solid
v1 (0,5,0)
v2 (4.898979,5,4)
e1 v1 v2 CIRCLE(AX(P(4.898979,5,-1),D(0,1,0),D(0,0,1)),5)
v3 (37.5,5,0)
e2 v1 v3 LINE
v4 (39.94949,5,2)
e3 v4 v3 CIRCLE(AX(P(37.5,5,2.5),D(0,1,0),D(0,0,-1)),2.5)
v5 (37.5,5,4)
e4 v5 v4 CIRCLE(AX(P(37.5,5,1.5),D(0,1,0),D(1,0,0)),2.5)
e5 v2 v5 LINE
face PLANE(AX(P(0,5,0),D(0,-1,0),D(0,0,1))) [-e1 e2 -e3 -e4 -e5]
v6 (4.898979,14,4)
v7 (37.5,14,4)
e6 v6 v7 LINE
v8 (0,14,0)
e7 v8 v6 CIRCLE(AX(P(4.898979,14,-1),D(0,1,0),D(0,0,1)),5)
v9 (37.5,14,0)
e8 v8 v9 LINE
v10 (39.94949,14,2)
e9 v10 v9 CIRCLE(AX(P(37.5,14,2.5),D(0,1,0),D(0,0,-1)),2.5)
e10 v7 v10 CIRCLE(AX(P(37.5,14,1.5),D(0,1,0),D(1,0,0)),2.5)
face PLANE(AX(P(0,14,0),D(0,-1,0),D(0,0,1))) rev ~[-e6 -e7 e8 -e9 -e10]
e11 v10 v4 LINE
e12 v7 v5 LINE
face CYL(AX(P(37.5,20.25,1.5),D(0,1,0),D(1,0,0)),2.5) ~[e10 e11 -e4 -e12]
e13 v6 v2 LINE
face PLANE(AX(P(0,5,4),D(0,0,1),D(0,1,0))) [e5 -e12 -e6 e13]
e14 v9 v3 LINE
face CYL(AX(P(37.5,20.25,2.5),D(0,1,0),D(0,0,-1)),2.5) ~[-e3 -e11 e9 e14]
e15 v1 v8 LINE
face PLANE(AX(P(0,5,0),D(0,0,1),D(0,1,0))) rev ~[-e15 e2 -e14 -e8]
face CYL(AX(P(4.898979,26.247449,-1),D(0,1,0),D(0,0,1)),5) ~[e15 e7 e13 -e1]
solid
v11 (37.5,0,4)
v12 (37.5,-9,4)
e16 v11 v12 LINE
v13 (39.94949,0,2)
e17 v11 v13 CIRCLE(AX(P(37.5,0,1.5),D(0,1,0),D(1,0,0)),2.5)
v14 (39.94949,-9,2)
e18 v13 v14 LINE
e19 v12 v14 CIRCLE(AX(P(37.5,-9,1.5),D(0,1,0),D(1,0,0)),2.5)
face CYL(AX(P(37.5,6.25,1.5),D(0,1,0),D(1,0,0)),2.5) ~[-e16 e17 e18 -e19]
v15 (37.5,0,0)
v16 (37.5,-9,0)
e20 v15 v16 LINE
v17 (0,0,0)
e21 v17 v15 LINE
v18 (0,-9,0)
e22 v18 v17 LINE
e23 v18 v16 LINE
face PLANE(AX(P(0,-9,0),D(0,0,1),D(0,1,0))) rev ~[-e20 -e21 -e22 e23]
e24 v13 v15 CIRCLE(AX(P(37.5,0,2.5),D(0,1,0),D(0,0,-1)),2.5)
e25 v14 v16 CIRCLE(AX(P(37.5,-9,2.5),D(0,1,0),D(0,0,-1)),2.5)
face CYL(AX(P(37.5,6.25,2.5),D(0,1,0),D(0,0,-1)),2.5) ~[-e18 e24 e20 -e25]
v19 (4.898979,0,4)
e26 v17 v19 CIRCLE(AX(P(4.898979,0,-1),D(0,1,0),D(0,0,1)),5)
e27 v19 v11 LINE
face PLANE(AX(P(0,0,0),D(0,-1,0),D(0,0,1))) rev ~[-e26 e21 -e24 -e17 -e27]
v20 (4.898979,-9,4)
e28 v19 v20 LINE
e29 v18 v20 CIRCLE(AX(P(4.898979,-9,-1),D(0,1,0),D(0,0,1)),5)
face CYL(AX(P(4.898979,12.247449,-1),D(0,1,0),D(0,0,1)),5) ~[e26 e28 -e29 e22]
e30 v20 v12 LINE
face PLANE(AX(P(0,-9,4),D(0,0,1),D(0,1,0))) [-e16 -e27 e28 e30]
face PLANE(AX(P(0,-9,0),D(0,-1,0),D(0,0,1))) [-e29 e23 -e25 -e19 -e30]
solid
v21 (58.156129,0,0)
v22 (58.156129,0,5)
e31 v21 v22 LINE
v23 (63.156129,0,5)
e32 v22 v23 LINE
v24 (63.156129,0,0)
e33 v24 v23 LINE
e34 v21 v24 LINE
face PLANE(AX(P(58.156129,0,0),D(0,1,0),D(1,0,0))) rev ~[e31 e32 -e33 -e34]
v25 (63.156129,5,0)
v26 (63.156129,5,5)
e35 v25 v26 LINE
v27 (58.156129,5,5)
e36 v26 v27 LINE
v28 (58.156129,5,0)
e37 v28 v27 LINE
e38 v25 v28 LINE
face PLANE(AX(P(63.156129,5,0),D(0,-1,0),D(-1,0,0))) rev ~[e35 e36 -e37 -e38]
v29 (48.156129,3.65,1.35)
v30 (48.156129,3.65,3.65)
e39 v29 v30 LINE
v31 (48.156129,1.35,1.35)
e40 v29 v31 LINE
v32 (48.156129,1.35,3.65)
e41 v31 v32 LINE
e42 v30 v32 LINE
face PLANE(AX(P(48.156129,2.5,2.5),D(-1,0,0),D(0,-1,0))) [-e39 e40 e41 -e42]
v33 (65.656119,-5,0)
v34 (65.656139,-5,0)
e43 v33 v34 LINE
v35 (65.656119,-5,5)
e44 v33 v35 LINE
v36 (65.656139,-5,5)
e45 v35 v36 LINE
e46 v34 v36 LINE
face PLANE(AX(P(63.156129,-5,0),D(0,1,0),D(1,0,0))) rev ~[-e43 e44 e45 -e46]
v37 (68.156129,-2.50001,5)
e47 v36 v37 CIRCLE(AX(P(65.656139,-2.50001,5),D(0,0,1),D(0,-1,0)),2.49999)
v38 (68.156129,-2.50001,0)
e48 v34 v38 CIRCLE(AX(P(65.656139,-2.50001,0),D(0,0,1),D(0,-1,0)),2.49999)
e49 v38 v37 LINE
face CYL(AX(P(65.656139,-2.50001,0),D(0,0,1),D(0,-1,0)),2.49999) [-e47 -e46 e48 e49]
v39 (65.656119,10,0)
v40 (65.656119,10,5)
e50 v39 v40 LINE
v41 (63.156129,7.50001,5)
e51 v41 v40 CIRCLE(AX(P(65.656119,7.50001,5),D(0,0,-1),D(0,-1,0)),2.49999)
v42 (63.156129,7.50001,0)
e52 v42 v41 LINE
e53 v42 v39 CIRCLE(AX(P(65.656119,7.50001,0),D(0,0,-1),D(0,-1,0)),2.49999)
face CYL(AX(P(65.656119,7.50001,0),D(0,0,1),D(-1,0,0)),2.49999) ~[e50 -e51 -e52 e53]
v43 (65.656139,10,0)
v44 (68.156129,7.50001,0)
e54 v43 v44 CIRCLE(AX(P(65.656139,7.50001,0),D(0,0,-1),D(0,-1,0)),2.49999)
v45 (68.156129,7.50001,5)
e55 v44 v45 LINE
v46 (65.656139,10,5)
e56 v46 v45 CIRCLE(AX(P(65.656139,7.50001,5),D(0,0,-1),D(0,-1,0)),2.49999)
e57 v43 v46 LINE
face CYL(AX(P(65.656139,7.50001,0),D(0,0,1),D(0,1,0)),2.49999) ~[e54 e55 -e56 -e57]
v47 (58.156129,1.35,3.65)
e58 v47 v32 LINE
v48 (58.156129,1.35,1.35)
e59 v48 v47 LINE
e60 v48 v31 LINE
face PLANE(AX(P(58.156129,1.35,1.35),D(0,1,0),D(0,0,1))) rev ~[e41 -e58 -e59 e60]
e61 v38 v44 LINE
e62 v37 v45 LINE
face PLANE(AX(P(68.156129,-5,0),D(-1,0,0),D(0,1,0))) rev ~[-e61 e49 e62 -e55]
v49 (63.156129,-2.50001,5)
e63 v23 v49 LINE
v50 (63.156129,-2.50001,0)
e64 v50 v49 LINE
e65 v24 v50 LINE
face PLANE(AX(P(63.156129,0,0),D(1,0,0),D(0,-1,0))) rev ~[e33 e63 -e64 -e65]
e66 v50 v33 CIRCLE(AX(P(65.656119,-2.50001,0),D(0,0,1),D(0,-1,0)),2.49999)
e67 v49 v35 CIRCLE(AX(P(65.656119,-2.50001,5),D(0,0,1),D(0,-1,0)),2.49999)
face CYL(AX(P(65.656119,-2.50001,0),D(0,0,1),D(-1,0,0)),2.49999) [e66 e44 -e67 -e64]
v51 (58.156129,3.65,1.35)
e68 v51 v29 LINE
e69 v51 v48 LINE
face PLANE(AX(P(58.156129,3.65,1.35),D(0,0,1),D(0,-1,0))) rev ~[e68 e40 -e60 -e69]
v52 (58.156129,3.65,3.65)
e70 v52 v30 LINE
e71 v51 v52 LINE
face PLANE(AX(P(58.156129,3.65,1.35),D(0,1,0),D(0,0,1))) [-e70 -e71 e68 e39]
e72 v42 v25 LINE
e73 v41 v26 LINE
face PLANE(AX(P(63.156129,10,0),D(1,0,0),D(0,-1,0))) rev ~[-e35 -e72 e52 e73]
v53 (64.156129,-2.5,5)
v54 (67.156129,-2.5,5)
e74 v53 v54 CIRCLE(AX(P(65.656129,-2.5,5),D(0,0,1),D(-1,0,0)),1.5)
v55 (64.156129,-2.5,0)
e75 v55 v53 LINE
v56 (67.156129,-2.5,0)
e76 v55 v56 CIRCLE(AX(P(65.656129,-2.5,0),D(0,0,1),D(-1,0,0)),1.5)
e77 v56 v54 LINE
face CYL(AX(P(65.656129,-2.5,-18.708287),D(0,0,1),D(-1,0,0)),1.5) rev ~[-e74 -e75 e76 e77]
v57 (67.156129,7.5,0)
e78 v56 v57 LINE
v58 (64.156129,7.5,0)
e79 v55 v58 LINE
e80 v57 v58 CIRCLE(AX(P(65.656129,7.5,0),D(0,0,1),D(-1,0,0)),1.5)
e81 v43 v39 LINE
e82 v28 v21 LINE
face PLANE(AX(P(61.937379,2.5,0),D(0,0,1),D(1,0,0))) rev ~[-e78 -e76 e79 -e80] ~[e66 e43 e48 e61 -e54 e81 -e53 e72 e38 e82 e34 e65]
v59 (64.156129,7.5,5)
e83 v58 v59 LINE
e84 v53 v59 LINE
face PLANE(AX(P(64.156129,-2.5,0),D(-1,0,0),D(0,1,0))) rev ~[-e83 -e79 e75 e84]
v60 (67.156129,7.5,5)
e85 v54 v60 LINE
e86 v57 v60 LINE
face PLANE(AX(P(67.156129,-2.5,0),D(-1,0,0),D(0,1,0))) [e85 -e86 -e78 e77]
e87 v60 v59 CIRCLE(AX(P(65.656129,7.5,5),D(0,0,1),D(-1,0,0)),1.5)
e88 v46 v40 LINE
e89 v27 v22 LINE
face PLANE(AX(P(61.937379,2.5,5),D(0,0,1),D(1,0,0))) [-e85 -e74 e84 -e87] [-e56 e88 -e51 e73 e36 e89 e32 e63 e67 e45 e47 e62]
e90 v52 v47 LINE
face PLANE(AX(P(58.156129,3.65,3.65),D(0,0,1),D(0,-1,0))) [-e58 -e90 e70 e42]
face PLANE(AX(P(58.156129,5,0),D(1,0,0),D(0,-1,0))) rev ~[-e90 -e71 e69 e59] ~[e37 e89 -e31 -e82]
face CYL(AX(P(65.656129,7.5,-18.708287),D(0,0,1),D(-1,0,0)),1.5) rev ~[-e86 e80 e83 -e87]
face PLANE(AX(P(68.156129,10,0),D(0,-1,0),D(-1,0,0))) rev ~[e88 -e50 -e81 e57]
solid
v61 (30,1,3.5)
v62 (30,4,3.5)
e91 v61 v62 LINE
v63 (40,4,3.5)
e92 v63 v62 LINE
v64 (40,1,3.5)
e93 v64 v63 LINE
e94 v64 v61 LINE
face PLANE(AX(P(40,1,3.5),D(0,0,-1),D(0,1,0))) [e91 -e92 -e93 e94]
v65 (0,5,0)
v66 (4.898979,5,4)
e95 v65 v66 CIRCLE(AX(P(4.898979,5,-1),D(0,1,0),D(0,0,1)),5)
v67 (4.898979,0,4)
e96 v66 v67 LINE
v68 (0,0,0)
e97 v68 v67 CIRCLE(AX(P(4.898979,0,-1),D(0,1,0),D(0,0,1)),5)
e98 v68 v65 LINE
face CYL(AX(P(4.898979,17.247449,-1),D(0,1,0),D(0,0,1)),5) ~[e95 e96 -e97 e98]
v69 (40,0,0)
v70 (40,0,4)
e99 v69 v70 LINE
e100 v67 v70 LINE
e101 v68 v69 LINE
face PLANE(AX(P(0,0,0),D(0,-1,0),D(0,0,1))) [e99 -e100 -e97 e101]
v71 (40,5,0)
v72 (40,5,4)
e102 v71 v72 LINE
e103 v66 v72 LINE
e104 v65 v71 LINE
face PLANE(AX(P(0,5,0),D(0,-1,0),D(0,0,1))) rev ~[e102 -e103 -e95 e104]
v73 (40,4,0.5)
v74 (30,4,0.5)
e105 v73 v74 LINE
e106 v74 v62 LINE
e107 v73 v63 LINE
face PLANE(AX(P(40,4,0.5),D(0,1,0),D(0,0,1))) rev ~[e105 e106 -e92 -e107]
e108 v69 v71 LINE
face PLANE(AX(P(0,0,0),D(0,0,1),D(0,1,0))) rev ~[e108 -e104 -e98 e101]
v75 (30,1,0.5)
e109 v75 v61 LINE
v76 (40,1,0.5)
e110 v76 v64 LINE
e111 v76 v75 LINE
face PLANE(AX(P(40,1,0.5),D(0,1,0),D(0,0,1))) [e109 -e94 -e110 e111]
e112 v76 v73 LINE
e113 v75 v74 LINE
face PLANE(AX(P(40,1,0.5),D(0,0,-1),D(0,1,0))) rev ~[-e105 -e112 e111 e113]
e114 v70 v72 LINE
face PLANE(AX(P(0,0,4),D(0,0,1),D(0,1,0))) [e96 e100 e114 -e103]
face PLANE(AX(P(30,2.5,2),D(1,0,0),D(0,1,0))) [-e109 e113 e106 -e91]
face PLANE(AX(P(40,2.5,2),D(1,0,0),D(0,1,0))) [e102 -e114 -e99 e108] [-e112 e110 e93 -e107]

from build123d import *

# Parameters (mm, degrees)
F0_W          = 9
F0_H          = 4
F1_DEPTH      = 40
F0_W_2        = 5
F2_DEPTH      = 40
F3_W          = 3
F3_H          = 3
F4_DEPTH      = 10
F5_T1_DEPTH   = 33.4948974279
F5_2_T1_DEPTH = 33.4948974279
F5_3_T1_DEPTH = 29.4948974279
F6_T1_DEPTH   = 21.5
F6_2_T1_DEPTH = 21.5
F7_W          = 1
F7_H          = 10
F8_DEPTH      = 5
F9_D          = 3
F10_W         = 2.3
F10_H         = 2.3
F11_DEPTH     = 10
F12_R         = 2.49999


# Not quite as in the source:
# - a fillet or chamfer that OpenCascade refuses, or shapes differently, is made with other operations: its cross-section is extruded or revolved along the edge and cut away or added
# - a fillet or chamfer is up to 0.001 mm smaller than in the source, because OpenCascade refuses the exact size


with BuildPart() as f1:
    # F0 (on Right) → F1 (new body)
    with BuildSketch(Plane.YZ):
        with Locations((-4.5, 2)):
            Rectangle(F0_W, F0_H)
    extrude(amount=F1_DEPTH)

    # F5: fillet of radius 5 on 1 edges, made by hand

    # F5_s2 → F5_t1 (cut)
    with BuildSketch(Plane.XZ.offset(-12.2474487139)):
        with BuildLine():
            ThreePointArc((4.8989794856, 4), (1.7367018254, 2.8729833462), (0, 0))
            Line((0, 0), (0, 4))
            Line((0, 4), (4.8989794856, 4))
        make_face()
    extrude(amount=F5_T1_DEPTH, mode=Mode.SUBTRACT)

    # F6: fillet of radius 2.5 on 2 edges, made by hand

    # F6_s2 → F6_t1 (cut)
    with BuildSketch(Plane.XZ.offset(-6.25)):
        with BuildLine():
            ThreePointArc((40, 1.5), (39.267766953, 3.267766953), (37.5, 4))
            Line((37.5, 4), (40, 4))
            Line((40, 4), (40, 1.5))
        make_face()
        with BuildLine():
            ThreePointArc((37.5, 0), (39.267766953, 0.732233047), (40, 2.5))
            Line((40, 2.5), (40, 0))
            Line((40, 0), (37.5, 0))
        make_face()
    extrude(amount=F6_T1_DEPTH, mode=Mode.SUBTRACT)


with BuildPart() as f1b:
    # F0 (on Right) → F1, piece 2 (new body)
    with BuildSketch(Plane.YZ):
        with Locations((9.5, 2)):
            Rectangle(F0_W, F0_H)
    extrude(amount=F1_DEPTH)

    # F5#2: fillet of radius 5 on 1 edges, made by hand

    # F5_2_s2 → F5_2_t1 (cut)
    with BuildSketch(Plane.XZ.offset(-26.2474487139)):
        with BuildLine():
            ThreePointArc((4.8989794856, 4), (1.7367018254, 2.8729833462), (0, 0))
            Line((0, 0), (0, 4))
            Line((0, 4), (4.8989794856, 4))
        make_face()
    extrude(amount=F5_2_T1_DEPTH, mode=Mode.SUBTRACT)

    # F6#2: fillet of radius 2.5 on 2 edges, made by hand

    # F6_2_s2 → F6_2_t1 (cut)
    with BuildSketch(Plane.XZ.offset(-20.25)):
        with BuildLine():
            ThreePointArc((40, 1.5), (39.267766953, 3.267766953), (37.5, 4))
            Line((37.5, 4), (40, 4))
            Line((40, 4), (40, 1.5))
        make_face()
        with BuildLine():
            ThreePointArc((37.5, 0), (39.267766953, 0.732233047), (40, 2.5))
            Line((40, 2.5), (40, 0))
            Line((40, 0), (37.5, 0))
        make_face()
    extrude(amount=F6_2_T1_DEPTH, mode=Mode.SUBTRACT)


with BuildPart() as f2:
    # F0 (on Right) → F2 (new body)
    with BuildSketch(Plane.YZ):
        with Locations((2.5, 2)):
            Rectangle(F0_W_2, F0_H)
    extrude(amount=F2_DEPTH)

    # F3 (on face) → F4 (cut)
    with BuildSketch(Plane.YZ.offset(40)):
        with Locations((2.5, 2)):
            Rectangle(F3_W, F3_H)
    extrude(amount=-F4_DEPTH, mode=Mode.SUBTRACT)

    # F5#3: fillet of radius 5 on 1 edges, made by hand

    # F5_3_s2 → F5_3_t1 (cut)
    with BuildSketch(Plane.XZ.offset(-17.2474487139)):
        with BuildLine():
            ThreePointArc((4.8989794856, 4), (1.7367018254, 2.8729833462), (0, 0))
            Line((0, 0), (0, 4))
            Line((0, 4), (4.8989794856, 4))
        make_face()
    extrude(amount=F5_3_T1_DEPTH, mode=Mode.SUBTRACT)


with BuildPart() as f8:
    # F7 (on Top) → F8 (new body)
    with BuildSketch(Plane.XY):
        Polygon((58.1561289728, 5), (58.1561289728, 0), (63.1561289728, 0), (63.1561289728, -2.5), (64.1561289728, -2.5), (64.1561289728, 7.5), (63.1561289728, 7.5), (63.1561289728, 5), align=None)
        Polygon((64.1561289728, -2.5), (63.1561289728, -2.5), (63.1561289728, -5), (68.1561289728, -5), (68.1561289728, -2.5), (67.1561289728, -2.5), align=None)
        Polygon((63.1561289728, 10), (63.1561289728, 7.5), (64.1561289728, 7.5), (67.1561289728, 7.5), (68.1561289728, 7.5), (68.1561289728, 10), align=None)
        with Locations((67.6561289728, 2.5)):
            Rectangle(F7_W, F7_H)
    extrude(amount=F8_DEPTH)

    # F9 (through all)
    with Locations(Plane(origin=(0, 0, 0), x_dir=(1, 0, 0), z_dir=(0, 0, -1))):
        with Locations((65.6561289728, -7.5), (65.6561289728, 2.5)):
            Hole(F9_D / 2)

    # F10 (on face) → F11 (join)
    with BuildSketch(Plane(origin=(58.1561289728, 0, 0), x_dir=(0, -1, 0), z_dir=(-1, 0, 0))):
        with Locations((-2.5, 2.5)):
            Rectangle(F10_W, F10_H)
    extrude(amount=F11_DEPTH)

    # F12 (radius 2.5 in the source; OpenCascade refuses exactly that, so slightly less here)
    f12_edges = [f8.edges().sort_by_distance(p)[0] for p in [
        (68.156129, 10, 2.5),
        (63.156129, 10, 2.5),
        (68.156129, -5, 2.5),
        (63.156129, -5, 2.5),
    ]]
    fillet(f12_edges, radius=F12_R)


solid = Compound([f1.part, f1b.part, f2.part, f8.part])
